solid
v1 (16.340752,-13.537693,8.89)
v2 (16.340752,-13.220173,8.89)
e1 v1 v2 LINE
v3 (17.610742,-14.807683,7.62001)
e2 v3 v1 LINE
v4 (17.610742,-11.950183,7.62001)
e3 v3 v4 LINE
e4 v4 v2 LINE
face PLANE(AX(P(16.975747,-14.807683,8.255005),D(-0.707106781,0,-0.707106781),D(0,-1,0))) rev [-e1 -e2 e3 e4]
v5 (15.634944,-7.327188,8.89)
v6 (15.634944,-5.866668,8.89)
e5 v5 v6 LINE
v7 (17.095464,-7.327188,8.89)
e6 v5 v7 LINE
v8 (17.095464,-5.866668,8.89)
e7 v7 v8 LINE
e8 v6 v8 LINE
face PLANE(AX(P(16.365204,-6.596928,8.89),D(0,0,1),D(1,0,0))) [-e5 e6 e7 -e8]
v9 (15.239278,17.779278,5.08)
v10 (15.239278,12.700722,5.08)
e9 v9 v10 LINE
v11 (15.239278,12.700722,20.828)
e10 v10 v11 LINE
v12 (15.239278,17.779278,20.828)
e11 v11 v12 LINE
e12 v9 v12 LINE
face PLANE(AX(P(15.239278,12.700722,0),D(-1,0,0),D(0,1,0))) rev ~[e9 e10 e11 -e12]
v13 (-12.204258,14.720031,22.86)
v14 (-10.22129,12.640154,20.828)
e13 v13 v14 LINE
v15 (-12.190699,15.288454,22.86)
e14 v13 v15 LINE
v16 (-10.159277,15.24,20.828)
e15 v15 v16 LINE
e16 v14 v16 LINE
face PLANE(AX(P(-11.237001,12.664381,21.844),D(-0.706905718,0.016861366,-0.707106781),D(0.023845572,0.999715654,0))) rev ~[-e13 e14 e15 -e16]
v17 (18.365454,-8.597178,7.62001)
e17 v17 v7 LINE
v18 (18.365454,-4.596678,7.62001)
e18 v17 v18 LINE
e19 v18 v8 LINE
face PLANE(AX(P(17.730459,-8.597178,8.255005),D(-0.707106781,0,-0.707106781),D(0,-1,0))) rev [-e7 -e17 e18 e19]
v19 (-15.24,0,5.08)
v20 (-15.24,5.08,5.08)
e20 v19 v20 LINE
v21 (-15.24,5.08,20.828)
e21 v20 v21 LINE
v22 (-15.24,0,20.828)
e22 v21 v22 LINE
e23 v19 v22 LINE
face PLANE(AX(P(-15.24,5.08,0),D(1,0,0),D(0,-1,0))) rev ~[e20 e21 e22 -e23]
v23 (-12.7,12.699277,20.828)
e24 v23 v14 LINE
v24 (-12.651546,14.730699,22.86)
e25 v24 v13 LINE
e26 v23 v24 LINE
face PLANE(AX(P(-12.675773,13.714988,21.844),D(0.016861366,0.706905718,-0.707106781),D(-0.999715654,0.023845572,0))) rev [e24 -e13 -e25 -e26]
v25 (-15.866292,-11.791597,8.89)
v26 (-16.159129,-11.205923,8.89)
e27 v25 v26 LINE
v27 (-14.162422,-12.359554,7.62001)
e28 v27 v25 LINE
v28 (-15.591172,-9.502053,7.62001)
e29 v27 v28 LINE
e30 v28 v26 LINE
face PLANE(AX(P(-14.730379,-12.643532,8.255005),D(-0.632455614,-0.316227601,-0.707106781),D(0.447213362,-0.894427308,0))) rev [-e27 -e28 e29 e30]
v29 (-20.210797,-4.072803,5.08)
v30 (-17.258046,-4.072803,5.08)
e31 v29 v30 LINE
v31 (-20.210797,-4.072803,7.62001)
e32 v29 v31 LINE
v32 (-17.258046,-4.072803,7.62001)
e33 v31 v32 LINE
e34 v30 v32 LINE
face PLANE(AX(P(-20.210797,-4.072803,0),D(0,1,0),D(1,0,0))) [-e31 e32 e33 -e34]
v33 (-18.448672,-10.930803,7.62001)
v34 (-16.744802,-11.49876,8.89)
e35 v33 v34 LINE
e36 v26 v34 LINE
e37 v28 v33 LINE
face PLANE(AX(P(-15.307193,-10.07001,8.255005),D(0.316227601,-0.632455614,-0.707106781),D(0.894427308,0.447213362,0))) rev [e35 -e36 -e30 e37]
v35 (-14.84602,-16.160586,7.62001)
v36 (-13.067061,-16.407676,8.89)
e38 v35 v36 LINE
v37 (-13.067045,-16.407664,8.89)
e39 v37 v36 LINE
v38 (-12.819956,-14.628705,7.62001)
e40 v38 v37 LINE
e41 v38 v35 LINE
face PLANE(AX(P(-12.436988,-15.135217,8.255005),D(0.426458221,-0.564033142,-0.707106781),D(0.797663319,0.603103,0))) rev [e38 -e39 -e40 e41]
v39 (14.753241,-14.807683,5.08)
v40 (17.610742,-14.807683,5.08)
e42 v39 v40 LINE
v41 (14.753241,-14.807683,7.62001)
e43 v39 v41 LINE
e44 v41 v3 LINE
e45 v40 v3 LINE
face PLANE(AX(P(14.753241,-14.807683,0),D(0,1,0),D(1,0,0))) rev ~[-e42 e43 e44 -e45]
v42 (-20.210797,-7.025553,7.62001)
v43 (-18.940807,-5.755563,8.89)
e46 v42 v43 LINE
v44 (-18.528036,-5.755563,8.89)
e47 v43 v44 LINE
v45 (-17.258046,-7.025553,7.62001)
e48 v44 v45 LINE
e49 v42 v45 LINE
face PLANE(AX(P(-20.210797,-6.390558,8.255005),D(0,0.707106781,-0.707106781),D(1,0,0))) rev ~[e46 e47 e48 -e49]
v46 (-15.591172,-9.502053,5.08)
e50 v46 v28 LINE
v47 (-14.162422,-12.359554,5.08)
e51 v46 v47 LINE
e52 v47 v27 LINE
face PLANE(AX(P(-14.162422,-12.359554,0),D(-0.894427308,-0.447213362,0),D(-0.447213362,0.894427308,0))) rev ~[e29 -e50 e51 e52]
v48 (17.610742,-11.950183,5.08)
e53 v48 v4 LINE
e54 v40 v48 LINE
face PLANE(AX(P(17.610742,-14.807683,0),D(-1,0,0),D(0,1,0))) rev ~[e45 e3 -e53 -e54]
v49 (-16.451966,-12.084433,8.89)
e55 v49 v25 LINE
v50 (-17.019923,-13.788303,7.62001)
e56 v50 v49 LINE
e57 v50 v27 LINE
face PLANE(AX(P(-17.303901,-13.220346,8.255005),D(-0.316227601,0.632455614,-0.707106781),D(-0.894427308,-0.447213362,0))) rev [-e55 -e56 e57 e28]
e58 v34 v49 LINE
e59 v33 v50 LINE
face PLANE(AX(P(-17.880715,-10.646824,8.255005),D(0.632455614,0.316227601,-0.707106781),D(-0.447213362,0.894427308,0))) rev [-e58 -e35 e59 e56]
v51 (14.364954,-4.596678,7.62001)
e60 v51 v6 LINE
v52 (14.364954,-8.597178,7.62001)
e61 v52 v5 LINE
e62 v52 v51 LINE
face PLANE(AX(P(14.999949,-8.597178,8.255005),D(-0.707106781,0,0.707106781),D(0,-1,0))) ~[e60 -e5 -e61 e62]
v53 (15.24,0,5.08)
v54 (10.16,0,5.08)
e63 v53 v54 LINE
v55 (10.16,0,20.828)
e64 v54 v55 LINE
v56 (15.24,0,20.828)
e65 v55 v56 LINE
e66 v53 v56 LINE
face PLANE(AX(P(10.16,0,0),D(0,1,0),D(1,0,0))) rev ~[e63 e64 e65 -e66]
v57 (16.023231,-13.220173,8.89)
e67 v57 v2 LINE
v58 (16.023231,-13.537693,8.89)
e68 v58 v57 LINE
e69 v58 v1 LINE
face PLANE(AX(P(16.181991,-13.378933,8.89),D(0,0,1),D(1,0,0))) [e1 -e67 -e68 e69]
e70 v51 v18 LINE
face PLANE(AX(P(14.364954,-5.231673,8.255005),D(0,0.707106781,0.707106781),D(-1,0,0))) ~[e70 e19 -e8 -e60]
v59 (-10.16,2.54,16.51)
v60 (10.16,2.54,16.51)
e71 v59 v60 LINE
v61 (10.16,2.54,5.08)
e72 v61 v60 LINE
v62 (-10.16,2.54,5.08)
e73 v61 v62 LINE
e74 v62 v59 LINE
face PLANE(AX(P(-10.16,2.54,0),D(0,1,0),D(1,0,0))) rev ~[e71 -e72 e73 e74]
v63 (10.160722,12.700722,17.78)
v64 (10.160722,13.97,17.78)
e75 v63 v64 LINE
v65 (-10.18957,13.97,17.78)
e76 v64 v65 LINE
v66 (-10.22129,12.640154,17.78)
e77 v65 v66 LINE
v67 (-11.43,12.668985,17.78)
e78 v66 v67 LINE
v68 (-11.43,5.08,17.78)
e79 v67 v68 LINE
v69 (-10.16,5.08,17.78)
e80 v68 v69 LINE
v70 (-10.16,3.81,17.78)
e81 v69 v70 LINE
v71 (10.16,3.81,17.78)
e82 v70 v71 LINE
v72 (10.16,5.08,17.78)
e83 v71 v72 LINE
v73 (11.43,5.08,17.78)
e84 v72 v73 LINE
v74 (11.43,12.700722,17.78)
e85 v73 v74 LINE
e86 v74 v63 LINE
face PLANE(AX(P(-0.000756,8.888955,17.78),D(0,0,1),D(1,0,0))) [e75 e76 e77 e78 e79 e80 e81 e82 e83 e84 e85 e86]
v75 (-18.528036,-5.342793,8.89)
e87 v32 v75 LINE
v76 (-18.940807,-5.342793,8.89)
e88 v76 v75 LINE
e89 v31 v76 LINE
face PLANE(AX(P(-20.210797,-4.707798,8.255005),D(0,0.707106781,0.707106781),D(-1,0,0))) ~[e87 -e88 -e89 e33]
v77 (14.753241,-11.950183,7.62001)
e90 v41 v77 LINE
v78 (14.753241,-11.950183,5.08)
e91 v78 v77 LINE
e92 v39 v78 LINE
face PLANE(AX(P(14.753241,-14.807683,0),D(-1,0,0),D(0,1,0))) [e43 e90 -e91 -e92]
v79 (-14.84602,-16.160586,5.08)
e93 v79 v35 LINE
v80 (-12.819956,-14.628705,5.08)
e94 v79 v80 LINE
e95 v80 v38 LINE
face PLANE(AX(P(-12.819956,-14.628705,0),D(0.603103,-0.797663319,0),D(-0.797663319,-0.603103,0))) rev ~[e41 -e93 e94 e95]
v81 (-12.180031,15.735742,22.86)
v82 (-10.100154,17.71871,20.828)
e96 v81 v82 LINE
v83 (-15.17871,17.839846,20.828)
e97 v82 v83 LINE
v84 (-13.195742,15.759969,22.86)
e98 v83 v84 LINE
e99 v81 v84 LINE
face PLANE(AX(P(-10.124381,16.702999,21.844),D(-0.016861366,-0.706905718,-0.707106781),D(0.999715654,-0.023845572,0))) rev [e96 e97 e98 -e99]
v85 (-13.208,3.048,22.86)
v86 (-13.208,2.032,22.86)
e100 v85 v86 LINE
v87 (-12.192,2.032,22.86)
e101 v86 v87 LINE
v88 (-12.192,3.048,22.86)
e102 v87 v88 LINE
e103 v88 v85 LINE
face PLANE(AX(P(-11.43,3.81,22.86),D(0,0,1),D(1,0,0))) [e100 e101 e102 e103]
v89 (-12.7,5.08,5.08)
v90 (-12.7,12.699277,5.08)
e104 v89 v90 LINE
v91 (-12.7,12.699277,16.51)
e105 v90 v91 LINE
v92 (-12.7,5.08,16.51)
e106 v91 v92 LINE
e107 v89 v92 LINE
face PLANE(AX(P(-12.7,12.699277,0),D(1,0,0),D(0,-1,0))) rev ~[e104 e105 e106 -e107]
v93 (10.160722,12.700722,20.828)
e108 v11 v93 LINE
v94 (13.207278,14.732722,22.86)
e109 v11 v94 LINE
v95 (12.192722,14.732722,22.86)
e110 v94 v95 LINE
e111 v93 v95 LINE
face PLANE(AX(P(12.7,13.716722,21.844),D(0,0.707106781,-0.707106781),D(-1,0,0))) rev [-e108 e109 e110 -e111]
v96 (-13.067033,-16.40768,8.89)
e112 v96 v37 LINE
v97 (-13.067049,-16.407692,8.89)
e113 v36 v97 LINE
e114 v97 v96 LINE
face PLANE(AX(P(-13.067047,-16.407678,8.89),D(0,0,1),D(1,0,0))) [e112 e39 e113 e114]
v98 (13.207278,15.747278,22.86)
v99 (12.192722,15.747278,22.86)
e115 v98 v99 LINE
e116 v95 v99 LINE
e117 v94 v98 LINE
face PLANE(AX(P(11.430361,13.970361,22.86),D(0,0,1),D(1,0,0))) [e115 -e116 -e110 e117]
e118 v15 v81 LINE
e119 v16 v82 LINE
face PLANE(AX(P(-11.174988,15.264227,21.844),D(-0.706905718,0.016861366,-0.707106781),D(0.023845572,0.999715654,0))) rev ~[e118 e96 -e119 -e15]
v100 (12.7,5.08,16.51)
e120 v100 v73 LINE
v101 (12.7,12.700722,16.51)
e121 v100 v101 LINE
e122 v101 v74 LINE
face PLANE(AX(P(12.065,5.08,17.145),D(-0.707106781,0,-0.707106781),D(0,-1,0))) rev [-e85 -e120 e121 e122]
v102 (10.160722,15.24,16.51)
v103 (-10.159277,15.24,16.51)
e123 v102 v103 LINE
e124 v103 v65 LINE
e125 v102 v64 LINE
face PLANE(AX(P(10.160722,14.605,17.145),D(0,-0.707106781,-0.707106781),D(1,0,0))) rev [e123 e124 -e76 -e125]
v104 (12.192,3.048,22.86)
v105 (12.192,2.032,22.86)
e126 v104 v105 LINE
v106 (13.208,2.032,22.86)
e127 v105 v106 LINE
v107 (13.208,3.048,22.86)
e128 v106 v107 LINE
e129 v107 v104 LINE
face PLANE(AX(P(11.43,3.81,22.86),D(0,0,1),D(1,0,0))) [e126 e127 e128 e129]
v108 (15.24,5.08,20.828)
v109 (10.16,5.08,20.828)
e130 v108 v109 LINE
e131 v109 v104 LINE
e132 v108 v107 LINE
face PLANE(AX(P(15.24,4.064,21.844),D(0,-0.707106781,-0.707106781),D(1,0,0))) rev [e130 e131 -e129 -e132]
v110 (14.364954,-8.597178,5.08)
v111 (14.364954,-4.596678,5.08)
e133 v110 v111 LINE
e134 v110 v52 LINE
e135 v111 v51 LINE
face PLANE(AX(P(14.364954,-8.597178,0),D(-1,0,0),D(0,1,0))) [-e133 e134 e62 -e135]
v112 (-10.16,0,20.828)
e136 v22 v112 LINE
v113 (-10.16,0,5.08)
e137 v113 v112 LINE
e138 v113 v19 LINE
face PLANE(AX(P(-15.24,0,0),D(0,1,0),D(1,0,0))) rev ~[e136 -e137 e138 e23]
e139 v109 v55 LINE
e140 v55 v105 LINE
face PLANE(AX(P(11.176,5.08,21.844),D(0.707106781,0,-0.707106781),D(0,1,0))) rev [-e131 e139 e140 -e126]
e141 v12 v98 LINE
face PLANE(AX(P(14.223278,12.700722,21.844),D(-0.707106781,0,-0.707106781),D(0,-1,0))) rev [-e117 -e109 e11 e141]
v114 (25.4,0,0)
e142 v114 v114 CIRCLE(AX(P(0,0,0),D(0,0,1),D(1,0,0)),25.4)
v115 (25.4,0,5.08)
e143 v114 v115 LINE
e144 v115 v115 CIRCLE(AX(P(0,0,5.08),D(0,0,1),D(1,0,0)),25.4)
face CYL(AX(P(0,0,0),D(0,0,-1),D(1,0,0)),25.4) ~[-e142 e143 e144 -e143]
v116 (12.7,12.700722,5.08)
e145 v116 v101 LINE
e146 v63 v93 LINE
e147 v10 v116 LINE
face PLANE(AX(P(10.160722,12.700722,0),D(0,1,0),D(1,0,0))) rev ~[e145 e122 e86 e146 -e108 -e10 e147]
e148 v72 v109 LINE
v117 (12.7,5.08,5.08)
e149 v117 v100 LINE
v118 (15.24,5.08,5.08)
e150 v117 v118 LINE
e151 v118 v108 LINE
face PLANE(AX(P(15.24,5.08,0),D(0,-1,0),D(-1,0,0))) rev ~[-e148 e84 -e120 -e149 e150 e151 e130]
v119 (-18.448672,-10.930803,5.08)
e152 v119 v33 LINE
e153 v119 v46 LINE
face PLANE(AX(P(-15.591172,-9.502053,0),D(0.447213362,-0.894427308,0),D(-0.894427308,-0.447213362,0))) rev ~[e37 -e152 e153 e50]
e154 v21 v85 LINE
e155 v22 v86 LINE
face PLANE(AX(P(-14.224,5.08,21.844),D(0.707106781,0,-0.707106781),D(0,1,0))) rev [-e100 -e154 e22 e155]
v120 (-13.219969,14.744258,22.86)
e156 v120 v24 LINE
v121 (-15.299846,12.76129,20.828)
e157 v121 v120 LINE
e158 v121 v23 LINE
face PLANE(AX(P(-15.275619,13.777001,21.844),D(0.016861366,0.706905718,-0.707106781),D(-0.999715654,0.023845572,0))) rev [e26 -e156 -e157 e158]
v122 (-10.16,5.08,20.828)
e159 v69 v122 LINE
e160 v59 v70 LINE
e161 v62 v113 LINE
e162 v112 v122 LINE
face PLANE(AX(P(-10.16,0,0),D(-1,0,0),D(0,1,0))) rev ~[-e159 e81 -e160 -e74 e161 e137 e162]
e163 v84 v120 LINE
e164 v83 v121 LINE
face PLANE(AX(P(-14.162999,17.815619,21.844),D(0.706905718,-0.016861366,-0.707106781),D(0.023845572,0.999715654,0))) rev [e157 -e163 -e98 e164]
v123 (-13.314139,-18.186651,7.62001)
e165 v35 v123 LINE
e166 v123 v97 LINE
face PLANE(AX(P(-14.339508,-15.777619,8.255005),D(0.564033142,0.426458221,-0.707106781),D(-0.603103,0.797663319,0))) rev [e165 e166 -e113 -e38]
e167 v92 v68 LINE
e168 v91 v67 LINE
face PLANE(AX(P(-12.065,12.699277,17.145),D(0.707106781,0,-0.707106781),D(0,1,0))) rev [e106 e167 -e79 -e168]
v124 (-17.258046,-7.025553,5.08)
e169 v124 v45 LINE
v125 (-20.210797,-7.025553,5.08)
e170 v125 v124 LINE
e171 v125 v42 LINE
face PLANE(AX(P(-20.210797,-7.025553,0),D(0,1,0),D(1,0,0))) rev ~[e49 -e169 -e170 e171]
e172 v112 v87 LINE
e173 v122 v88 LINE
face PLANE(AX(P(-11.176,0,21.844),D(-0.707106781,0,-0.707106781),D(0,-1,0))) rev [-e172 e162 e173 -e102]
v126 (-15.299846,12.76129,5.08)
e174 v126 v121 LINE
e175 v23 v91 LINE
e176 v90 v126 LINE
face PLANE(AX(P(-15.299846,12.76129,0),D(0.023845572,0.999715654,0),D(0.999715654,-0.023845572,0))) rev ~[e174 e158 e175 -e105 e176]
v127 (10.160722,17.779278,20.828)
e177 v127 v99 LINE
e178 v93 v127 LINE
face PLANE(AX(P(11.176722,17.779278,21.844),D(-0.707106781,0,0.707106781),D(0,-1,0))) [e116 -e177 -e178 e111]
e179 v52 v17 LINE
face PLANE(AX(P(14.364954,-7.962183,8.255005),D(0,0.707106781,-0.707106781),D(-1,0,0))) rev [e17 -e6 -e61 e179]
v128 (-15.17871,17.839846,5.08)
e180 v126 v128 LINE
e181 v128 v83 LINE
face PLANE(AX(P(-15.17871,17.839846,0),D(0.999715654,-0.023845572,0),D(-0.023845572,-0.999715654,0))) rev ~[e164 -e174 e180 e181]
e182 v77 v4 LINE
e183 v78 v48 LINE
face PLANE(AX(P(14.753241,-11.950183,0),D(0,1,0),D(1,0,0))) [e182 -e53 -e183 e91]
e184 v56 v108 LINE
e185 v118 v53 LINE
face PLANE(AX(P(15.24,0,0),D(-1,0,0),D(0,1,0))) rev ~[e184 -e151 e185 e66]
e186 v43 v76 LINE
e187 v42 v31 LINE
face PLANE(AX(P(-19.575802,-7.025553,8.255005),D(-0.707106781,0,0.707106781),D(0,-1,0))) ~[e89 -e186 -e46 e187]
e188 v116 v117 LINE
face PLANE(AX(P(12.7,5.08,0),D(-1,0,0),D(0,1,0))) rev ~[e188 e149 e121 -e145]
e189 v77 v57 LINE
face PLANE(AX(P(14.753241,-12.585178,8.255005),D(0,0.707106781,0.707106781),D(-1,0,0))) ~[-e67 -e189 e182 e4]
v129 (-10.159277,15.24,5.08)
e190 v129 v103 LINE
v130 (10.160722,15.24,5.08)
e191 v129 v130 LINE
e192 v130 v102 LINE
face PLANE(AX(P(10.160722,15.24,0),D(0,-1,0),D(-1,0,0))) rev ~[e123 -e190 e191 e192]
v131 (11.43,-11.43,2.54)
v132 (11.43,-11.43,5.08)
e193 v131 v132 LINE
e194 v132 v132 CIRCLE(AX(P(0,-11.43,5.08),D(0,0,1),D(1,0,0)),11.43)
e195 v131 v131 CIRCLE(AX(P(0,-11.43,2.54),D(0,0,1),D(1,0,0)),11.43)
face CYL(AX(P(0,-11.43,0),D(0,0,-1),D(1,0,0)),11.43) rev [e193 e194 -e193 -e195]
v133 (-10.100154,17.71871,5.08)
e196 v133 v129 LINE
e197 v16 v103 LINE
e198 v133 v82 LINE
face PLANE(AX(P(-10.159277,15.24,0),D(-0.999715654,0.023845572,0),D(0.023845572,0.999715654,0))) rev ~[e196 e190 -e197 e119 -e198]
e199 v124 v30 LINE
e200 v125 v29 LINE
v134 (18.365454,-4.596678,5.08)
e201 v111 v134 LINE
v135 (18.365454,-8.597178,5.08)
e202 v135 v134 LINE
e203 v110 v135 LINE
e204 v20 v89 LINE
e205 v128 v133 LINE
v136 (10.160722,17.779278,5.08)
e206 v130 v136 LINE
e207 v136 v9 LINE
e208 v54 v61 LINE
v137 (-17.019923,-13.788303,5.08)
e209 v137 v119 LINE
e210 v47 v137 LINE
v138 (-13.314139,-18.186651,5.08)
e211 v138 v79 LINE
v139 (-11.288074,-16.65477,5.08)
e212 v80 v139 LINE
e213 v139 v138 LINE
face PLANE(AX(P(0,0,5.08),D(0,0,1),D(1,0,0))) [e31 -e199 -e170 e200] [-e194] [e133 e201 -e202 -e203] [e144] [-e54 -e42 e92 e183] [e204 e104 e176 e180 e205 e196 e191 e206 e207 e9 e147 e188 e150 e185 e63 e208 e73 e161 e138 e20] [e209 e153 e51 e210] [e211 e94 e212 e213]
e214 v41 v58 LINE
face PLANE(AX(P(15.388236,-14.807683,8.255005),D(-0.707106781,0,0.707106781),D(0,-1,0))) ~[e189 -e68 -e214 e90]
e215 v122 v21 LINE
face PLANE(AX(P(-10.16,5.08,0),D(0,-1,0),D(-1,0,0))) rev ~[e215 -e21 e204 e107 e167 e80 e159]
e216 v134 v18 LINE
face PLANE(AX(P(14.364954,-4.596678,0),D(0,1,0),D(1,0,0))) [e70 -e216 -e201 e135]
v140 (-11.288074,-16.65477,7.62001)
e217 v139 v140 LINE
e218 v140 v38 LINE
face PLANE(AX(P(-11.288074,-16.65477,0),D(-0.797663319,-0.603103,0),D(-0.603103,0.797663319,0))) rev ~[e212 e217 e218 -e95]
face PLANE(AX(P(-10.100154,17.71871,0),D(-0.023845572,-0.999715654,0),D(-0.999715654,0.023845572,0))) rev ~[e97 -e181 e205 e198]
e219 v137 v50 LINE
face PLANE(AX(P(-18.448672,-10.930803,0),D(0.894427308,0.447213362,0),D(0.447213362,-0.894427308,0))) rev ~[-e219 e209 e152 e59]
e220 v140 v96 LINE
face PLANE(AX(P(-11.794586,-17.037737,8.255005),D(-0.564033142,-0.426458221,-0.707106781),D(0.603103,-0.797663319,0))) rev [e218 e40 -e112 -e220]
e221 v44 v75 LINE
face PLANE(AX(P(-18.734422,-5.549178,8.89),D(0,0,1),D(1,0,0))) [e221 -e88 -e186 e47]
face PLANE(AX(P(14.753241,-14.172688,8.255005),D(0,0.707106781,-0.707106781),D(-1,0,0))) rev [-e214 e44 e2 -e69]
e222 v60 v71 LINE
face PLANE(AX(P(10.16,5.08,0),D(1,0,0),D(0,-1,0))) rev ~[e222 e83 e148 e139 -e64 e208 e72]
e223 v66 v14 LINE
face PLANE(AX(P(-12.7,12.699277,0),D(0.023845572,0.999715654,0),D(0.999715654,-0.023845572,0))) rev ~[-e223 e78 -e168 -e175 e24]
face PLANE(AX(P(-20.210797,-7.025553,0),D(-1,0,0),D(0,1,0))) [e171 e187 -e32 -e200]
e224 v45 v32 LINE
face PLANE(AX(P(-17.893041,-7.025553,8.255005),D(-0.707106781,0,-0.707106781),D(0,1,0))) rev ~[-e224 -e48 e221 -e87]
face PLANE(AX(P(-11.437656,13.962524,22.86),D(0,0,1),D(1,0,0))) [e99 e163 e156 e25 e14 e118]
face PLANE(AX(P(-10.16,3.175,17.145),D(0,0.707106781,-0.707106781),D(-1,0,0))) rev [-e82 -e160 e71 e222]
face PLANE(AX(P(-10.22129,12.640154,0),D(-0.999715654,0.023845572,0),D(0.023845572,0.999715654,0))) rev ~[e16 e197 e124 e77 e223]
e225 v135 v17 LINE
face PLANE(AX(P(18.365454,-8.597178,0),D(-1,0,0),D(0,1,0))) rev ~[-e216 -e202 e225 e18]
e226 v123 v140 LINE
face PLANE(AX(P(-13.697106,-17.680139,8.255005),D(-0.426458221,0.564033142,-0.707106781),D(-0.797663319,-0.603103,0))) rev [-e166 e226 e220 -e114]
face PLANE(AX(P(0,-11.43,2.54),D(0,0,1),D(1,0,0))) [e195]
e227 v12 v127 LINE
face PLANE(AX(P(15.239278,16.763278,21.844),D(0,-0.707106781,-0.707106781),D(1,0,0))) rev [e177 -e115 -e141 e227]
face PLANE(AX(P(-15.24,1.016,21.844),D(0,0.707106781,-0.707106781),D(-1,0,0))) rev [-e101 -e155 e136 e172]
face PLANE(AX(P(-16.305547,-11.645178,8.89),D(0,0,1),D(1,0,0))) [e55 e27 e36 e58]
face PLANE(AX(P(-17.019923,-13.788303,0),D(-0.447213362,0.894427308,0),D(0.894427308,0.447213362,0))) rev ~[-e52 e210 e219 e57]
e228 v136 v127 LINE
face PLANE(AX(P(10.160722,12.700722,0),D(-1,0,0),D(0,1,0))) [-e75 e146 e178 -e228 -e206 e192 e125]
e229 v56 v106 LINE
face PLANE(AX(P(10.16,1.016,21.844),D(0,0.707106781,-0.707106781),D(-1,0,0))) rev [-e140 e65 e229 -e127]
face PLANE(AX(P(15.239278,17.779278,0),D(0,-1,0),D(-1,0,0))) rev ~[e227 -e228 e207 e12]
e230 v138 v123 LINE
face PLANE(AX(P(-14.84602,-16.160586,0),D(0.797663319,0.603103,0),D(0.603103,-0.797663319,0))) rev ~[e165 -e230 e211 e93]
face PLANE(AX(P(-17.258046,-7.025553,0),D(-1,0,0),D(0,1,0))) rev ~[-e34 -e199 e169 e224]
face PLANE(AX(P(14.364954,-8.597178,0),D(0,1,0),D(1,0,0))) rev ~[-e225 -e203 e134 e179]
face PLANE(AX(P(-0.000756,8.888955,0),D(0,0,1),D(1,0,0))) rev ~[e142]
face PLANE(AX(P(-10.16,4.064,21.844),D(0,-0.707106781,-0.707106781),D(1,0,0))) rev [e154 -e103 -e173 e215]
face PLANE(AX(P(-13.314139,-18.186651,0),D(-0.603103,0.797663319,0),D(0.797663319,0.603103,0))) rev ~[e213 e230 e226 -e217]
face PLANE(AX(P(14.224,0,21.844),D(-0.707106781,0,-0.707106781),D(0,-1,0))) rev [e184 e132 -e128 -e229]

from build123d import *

# Parameters (mm, degrees)
F0_R     = 25.4
F0_W     = 2.9527507722
F0_H     = 2.9527507722
F0_R_2   = 11.43
F0_W_2   = 2.8575006872
F0_H_2   = 2.8575006872
F0_W_3   = 4.0005007759
F0_H_3   = 4.0005007759
F1_DEPTH = 5.08
F2_DEPTH = 2.54
F3_DEPTH = 17.78
F0_W_4   = 2.54
F0_H_4   = 2.54
F0_W_5   = 2.5392780889
F0_H_5   = 2.5392780889
F4_DEPTH = 22.86
F5_DEPTH = 8.89
F6_SIZE  = 1.26999
F7_SIZE  = 2.032
F8_SIZE  = 1.27


# Not quite as in the source:
# - a fillet or chamfer is up to 0.001 mm smaller than in the source, because OpenCascade refuses the exact size


with BuildPart() as f1:
    # F0 (on Top) → F1 (new body)
    with BuildSketch(Plane.XY):
        Circle(F0_R)
        Polygon((-14.8460203377, -16.160586299), (-12.8199555069, -14.6287046778), (-11.2880738857, -16.6547695086), (-13.3141387165, -18.1866511298), align=None, mode=Mode.SUBTRACT)
        Polygon((-17.0199228451, -13.7883033603), (-18.4486722574, -10.9308026731), (-15.5911715701, -9.5020532608), (-14.1624221578, -12.359553948), align=None, mode=Mode.SUBTRACT)
        with Locations((-18.734421581, -5.5491779931)):
            Rectangle(F0_W, F0_H, mode=Mode.SUBTRACT)
        with Locations((0, -11.43)):
            Circle(F0_R_2, mode=Mode.SUBTRACT)
        with Locations((16.1819914356, -13.3789330721)):
            Rectangle(F0_W_2, F0_H_2, mode=Mode.SUBTRACT)
        with Locations((16.3652040064, -6.5969279967)):
            Rectangle(F0_W_3, F0_H_3, mode=Mode.SUBTRACT)
        Polygon((-10.1001541496, 17.7187103274), (-10.1592772274, 15.24), (10.1607219111, 15.24), (10.1607219111, 17.7792780889), (15.2392780889, 17.7792780889), (15.2392780889, 12.7007219111), (12.7, 12.7007219111), (12.7, 5.08), (15.24, 5.08), (15.24, 0), (10.16, 0), (10.16, 2.54), (-10.16, 2.54), (-10.16, 0), (-15.24, 0), (-15.24, 5.08), (-12.7, 5.08), (-12.7, 12.6992772274), (-15.2998458504, 12.7612896726), (-15.1787103274, 17.8398458504), align=None, mode=Mode.SUBTRACT)
    extrude(amount=F1_DEPTH)

    # F0 (on Top) → F2 (join)
    with BuildSketch(Plane.XY):
        with Locations((0, -11.43)):
            Circle(F0_R_2)
    extrude(amount=F2_DEPTH)

    # F0 (on Top) → F3 (join)
    with BuildSketch(Plane.XY):
        Polygon((10.1607219111, 15.24), (-10.1592772274, 15.24), (-10.2212896726, 12.6401541496), (-12.7, 12.6992772274), (-12.7, 5.08), (-10.16, 5.08), (-10.16, 2.54), (10.16, 2.54), (10.16, 5.08), (12.7, 5.08), (12.7, 12.7007219111), (10.1607219111, 12.7007219111), align=None)
    extrude(amount=F3_DEPTH)

    # F0 (on Top) → F4 (join)
    with BuildSketch(Plane.XY):
        Polygon((-10.1592772274, 15.24), (-12.7, 15.24), (-12.7, 12.6992772274), (-10.2212896726, 12.6401541496), align=None)
        Polygon((-12.7, 12.6992772274), (-12.7, 15.24), (-10.1592772274, 15.24), (-10.1001541496, 17.7187103274), (-15.1787103274, 17.8398458504), (-15.2998458504, 12.7612896726), align=None)
        with Locations((-11.43, 3.81)):
            Rectangle(F0_W_4, F0_H_4)
        Polygon((-12.7, 2.54), (-12.7, 5.08), (-15.24, 5.08), (-15.24, 0), (-10.16, 0), (-10.16, 2.54), align=None)
        with Locations((11.4303609556, 13.9703609556)):
            Rectangle(F0_W_5, F0_H_5)
        Polygon((10.1607219111, 17.7792780889), (10.1607219111, 15.24), (12.7, 15.24), (12.7, 12.7007219111), (15.2392780889, 12.7007219111), (15.2392780889, 17.7792780889), align=None)
        with Locations((11.43, 3.81)):
            Rectangle(F0_W_4, F0_H_4)
        Polygon((15.24, 5.08), (12.7, 5.08), (12.7, 2.54), (10.16, 2.54), (10.16, 0), (15.24, 0), align=None)
    extrude(amount=F4_DEPTH)

    # F0 (on Top) → F5 (join)
    with BuildSketch(Plane.XY):
        with Locations((-18.734421581, -5.5491779931)):
            Rectangle(F0_W, F0_H)
        Polygon((-15.5911715701, -9.5020532608), (-18.4486722574, -10.9308026731), (-17.0199228451, -13.7883033603), (-14.1624221578, -12.359553948), align=None)
        Polygon((-11.2880738857, -16.6547695086), (-12.8199555069, -14.6287046778), (-14.8460203377, -16.160586299), (-13.3141387165, -18.1866511298), align=None)
        with Locations((16.3652040064, -6.5969279967)):
            Rectangle(F0_W_3, F0_H_3)
        with Locations((16.1819914356, -13.3789330721)):
            Rectangle(F0_W_2, F0_H_2)
    extrude(amount=F5_DEPTH)

    # F6 (size 1.27 in the source; OpenCascade refuses exactly that, so slightly less here)
    f6_edges = [f1.edges().sort_by_distance(p)[0] for p in [
        (-18.734422, -4.072803, 8.89),
        (-20.210797, -5.549178, 8.89),
        (-18.734422, -7.025553, 8.89),
        (-17.258046, -5.549178, 8.89),
        (-17.019922, -10.216428, 8.89),
        (-17.734298, -12.359553, 8.89),
        (-15.591173, -13.073929, 8.89),
        (-14.876797, -10.930804, 8.89),
        (-12.301106, -17.42071, 8.89),
        (-12.054015, -15.641737, 8.89),
        (-13.832988, -15.394645, 8.89),
        (-14.08008, -17.173619, 8.89),
        (16.365204, -4.596678, 8.89),
        (14.364954, -6.596928, 8.89),
        (16.365204, -8.597178, 8.89),
        (18.365454, -6.596928, 8.89),
        (16.181991, -14.807683, 8.89),
        (17.610742, -13.378933, 8.89),
        (16.181991, -11.950183, 8.89),
        (14.753241, -13.378933, 8.89),
    ]]
    chamfer(f6_edges, length=F6_SIZE)

    # F7
    f7_edges = [f1.edges().sort_by_distance(p)[0] for p in [
        (-10.160722, 15.179432, 22.86),
        (-12.639432, 17.779278, 22.86),
        (-15.239278, 15.300568, 22.86),
        (-12.760568, 12.700722, 22.86),
        (-12.7, 5.08, 22.86),
        (-15.24, 2.54, 22.86),
        (-12.7, 0, 22.86),
        (-10.16, 2.54, 22.86),
        (12.7, 12.700722, 22.86),
        (15.239278, 15.24, 22.86),
        (12.7, 17.779278, 22.86),
        (10.160722, 15.24, 22.86),
        (10.16, 2.54, 22.86),
        (12.7, 0, 22.86),
        (15.24, 2.54, 22.86),
        (12.7, 5.08, 22.86),
    ]]
    chamfer(f7_edges, length=F7_SIZE)

    # F8
    f8_edges = [f1.edges().sort_by_distance(p)[0] for p in [
        (0, 2.54, 17.78),
        (0.000722, 15.24, 17.78),
        (-12.7, 8.889639, 17.78),
        (12.7, 8.890361, 17.78),
    ]]
    chamfer(f8_edges, length=F8_SIZE)


solid = f1.part
